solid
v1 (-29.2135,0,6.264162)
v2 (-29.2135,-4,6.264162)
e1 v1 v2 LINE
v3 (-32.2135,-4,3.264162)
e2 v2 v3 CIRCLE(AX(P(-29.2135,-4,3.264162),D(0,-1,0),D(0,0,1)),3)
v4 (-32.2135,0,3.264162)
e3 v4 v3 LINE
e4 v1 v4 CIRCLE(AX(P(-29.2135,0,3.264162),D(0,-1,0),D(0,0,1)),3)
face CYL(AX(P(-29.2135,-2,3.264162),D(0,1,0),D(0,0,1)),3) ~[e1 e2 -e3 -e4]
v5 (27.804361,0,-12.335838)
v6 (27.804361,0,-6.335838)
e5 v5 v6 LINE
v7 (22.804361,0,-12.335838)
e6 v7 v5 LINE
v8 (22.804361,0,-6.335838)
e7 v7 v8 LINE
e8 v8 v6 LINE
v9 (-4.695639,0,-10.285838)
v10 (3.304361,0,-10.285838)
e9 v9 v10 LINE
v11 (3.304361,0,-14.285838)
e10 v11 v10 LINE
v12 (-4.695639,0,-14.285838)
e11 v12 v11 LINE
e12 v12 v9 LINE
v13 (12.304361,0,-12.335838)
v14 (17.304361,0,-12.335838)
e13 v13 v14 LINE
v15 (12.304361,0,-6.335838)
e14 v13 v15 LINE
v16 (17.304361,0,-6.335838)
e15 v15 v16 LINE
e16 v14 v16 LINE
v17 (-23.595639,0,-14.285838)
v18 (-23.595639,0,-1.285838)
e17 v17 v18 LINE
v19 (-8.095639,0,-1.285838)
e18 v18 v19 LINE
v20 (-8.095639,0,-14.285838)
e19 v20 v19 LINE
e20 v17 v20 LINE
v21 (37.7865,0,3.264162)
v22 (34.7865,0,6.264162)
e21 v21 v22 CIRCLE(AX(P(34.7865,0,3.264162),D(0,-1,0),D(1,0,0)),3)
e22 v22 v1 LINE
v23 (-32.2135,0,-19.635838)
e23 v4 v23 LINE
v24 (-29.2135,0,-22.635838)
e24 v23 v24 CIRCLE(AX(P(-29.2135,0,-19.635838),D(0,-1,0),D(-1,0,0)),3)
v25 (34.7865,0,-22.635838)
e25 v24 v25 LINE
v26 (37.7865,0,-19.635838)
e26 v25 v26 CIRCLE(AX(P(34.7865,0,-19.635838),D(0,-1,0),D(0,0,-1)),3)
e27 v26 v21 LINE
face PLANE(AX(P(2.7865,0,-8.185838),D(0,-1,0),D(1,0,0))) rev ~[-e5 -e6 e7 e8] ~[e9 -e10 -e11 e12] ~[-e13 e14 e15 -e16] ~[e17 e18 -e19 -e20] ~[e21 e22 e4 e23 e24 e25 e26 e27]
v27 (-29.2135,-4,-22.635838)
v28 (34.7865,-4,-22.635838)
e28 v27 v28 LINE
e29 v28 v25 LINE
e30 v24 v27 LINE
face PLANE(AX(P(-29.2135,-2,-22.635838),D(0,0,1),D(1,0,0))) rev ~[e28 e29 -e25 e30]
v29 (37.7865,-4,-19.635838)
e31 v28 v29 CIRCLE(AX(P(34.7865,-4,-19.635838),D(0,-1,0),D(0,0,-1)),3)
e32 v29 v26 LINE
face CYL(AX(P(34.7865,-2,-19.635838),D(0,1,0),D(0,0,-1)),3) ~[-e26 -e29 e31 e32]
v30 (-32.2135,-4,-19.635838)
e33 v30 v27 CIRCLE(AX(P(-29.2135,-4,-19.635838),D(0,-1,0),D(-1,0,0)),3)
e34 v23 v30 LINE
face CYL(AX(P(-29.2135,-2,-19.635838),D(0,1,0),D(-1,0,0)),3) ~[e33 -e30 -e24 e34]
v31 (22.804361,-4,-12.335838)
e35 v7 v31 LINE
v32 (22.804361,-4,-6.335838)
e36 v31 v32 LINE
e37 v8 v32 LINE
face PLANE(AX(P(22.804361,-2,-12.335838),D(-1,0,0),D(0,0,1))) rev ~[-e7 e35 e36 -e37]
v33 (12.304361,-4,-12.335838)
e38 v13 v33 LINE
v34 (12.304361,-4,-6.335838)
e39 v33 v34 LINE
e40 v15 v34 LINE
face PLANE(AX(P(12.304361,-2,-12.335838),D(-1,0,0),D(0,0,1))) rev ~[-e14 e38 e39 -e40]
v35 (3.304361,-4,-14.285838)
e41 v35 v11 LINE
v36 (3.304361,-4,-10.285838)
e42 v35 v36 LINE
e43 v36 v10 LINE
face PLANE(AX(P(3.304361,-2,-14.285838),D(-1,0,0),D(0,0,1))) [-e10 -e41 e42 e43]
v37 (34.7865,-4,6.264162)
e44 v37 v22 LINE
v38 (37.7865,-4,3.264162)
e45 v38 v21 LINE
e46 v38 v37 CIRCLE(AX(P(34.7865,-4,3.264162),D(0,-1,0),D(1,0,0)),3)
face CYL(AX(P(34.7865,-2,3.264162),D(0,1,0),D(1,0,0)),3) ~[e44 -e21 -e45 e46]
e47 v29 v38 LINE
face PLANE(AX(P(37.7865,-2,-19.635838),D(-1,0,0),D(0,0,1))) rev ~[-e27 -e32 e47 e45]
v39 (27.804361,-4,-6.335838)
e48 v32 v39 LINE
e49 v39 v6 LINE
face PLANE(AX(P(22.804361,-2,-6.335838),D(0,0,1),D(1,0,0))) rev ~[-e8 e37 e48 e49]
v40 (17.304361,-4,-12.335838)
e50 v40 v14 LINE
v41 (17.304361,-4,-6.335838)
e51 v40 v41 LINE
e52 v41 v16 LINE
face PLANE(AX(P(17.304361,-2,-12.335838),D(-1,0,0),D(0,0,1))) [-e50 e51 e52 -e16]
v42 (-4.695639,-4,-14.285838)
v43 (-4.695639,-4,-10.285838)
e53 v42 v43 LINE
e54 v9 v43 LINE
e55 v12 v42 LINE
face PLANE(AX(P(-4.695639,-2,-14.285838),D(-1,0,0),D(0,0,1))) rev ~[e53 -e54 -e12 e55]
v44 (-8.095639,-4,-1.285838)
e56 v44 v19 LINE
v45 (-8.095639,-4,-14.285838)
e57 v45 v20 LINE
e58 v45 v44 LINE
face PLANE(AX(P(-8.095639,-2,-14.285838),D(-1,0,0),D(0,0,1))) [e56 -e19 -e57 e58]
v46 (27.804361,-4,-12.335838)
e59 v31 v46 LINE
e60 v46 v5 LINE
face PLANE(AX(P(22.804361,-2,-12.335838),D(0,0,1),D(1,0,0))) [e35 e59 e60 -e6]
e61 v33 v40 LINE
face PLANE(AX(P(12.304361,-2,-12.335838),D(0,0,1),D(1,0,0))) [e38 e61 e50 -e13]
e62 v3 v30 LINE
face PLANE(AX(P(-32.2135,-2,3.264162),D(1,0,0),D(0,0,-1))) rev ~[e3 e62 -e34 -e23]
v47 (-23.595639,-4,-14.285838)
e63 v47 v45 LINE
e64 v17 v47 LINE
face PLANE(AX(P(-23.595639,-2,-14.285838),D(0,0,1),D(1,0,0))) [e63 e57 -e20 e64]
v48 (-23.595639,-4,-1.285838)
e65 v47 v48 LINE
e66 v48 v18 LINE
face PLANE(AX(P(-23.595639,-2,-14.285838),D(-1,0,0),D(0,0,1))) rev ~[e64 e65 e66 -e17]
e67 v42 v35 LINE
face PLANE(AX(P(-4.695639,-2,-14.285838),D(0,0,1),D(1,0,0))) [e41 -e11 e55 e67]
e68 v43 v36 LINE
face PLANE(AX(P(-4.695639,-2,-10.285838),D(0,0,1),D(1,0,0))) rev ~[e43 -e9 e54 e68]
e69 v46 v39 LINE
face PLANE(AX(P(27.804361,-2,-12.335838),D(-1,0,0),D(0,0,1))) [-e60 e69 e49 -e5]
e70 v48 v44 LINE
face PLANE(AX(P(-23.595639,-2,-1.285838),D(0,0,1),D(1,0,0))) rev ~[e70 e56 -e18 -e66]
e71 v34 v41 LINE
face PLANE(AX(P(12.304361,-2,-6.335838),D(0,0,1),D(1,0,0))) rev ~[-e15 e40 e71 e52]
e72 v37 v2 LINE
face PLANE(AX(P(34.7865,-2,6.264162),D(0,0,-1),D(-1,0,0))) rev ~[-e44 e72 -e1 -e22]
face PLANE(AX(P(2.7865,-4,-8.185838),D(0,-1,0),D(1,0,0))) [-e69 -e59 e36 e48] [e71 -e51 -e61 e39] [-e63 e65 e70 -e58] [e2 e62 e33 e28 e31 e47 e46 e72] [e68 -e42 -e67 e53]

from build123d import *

# Parameters (mm, degrees)
F0_W     = 8
F0_H     = 4
F0_W_2   = 5
F0_H_2   = 6
F0_W_3   = 15.5
F0_H_3   = 13
F1_DEPTH = 1.8
F2_DEPTH = 2
F3_DEPTH = 2


# Not quite as in the source:
# - a feature of the source that left no trace in its solid (it failed there, or was rolled back) is left out


with BuildPart() as f1:
    # F0 (on Front) → F1 (new body)
    with BuildSketch(Plane.XZ):
        with BuildLine():
            Line((34.7865003794, 6.2641621617), (-29.2134996206, 6.2641621617))
            ThreePointArc((-29.2134996206, 6.2641621617), (-31.3348199641, 5.3854825052), (-32.2134996206, 3.2641621617))
            Line((-32.2134996206, 3.2641621617), (-32.2134996206, -19.6358378383))
            ThreePointArc((-32.2134996206, -19.6358378383), (-31.3348199641, -21.7571581819), (-29.2134996206, -22.6358378383))
            Line((-29.2134996206, -22.6358378383), (34.7865003794, -22.6358378383))
            ThreePointArc((34.7865003794, -22.6358378383), (36.907820723, -21.7571581819), (37.7865003794, -19.6358378383))
            Line((37.7865003794, -19.6358378383), (37.7865003794, 3.2641621617))
            ThreePointArc((37.7865003794, 3.2641621617), (36.907820723, 5.3854825052), (34.7865003794, 6.2641621617))
        make_face()
        with Locations((-0.6956385732, -12.2858378383)):
            Rectangle(F0_W, F0_H, mode=Mode.SUBTRACT)
        with Locations((14.8043614268, -9.3358378383)):
            Rectangle(F0_W_2, F0_H_2, mode=Mode.SUBTRACT)
        with Locations((25.3043614268, -9.3358378383)):
            Rectangle(F0_W_2, F0_H_2, mode=Mode.SUBTRACT)
        with Locations((-15.8456385732, -7.7858378383)):
            Rectangle(F0_W_3, F0_H_3, mode=Mode.SUBTRACT)
    extrude(amount=F1_DEPTH)

    # F0 (on Front) → F2 (join)
    with BuildSketch(Plane.XZ):
        with BuildLine():
            Line((34.7865003794, 6.2641621617), (-29.2134996206, 6.2641621617))
            ThreePointArc((-29.2134996206, 6.2641621617), (-31.3348199641, 5.3854825052), (-32.2134996206, 3.2641621617))
            Line((-32.2134996206, 3.2641621617), (-32.2134996206, -19.6358378383))
            ThreePointArc((-32.2134996206, -19.6358378383), (-31.3348199641, -21.7571581819), (-29.2134996206, -22.6358378383))
            Line((-29.2134996206, -22.6358378383), (34.7865003794, -22.6358378383))
            ThreePointArc((34.7865003794, -22.6358378383), (36.907820723, -21.7571581819), (37.7865003794, -19.6358378383))
            Line((37.7865003794, -19.6358378383), (37.7865003794, 3.2641621617))
            ThreePointArc((37.7865003794, 3.2641621617), (36.907820723, 5.3854825052), (34.7865003794, 6.2641621617))
        make_face()
        with Locations((-0.6956385732, -12.2858378383)):
            Rectangle(F0_W, F0_H, mode=Mode.SUBTRACT)
        with Locations((14.8043614268, -9.3358378383)):
            Rectangle(F0_W_2, F0_H_2, mode=Mode.SUBTRACT)
        with Locations((25.3043614268, -9.3358378383)):
            Rectangle(F0_W_2, F0_H_2, mode=Mode.SUBTRACT)
        with Locations((-15.8456385732, -7.7858378383)):
            Rectangle(F0_W_3, F0_H_3, mode=Mode.SUBTRACT)
    extrude(amount=F2_DEPTH)

    # F3 (add): a face of the model
    f3_faces = [f1.faces().sort_by_distance(p)[0] for p in [
        (4.4299984424, -2, -8.1163746121),
    ]]
    extrude(f3_faces, amount=F3_DEPTH)


solid = f1.part
